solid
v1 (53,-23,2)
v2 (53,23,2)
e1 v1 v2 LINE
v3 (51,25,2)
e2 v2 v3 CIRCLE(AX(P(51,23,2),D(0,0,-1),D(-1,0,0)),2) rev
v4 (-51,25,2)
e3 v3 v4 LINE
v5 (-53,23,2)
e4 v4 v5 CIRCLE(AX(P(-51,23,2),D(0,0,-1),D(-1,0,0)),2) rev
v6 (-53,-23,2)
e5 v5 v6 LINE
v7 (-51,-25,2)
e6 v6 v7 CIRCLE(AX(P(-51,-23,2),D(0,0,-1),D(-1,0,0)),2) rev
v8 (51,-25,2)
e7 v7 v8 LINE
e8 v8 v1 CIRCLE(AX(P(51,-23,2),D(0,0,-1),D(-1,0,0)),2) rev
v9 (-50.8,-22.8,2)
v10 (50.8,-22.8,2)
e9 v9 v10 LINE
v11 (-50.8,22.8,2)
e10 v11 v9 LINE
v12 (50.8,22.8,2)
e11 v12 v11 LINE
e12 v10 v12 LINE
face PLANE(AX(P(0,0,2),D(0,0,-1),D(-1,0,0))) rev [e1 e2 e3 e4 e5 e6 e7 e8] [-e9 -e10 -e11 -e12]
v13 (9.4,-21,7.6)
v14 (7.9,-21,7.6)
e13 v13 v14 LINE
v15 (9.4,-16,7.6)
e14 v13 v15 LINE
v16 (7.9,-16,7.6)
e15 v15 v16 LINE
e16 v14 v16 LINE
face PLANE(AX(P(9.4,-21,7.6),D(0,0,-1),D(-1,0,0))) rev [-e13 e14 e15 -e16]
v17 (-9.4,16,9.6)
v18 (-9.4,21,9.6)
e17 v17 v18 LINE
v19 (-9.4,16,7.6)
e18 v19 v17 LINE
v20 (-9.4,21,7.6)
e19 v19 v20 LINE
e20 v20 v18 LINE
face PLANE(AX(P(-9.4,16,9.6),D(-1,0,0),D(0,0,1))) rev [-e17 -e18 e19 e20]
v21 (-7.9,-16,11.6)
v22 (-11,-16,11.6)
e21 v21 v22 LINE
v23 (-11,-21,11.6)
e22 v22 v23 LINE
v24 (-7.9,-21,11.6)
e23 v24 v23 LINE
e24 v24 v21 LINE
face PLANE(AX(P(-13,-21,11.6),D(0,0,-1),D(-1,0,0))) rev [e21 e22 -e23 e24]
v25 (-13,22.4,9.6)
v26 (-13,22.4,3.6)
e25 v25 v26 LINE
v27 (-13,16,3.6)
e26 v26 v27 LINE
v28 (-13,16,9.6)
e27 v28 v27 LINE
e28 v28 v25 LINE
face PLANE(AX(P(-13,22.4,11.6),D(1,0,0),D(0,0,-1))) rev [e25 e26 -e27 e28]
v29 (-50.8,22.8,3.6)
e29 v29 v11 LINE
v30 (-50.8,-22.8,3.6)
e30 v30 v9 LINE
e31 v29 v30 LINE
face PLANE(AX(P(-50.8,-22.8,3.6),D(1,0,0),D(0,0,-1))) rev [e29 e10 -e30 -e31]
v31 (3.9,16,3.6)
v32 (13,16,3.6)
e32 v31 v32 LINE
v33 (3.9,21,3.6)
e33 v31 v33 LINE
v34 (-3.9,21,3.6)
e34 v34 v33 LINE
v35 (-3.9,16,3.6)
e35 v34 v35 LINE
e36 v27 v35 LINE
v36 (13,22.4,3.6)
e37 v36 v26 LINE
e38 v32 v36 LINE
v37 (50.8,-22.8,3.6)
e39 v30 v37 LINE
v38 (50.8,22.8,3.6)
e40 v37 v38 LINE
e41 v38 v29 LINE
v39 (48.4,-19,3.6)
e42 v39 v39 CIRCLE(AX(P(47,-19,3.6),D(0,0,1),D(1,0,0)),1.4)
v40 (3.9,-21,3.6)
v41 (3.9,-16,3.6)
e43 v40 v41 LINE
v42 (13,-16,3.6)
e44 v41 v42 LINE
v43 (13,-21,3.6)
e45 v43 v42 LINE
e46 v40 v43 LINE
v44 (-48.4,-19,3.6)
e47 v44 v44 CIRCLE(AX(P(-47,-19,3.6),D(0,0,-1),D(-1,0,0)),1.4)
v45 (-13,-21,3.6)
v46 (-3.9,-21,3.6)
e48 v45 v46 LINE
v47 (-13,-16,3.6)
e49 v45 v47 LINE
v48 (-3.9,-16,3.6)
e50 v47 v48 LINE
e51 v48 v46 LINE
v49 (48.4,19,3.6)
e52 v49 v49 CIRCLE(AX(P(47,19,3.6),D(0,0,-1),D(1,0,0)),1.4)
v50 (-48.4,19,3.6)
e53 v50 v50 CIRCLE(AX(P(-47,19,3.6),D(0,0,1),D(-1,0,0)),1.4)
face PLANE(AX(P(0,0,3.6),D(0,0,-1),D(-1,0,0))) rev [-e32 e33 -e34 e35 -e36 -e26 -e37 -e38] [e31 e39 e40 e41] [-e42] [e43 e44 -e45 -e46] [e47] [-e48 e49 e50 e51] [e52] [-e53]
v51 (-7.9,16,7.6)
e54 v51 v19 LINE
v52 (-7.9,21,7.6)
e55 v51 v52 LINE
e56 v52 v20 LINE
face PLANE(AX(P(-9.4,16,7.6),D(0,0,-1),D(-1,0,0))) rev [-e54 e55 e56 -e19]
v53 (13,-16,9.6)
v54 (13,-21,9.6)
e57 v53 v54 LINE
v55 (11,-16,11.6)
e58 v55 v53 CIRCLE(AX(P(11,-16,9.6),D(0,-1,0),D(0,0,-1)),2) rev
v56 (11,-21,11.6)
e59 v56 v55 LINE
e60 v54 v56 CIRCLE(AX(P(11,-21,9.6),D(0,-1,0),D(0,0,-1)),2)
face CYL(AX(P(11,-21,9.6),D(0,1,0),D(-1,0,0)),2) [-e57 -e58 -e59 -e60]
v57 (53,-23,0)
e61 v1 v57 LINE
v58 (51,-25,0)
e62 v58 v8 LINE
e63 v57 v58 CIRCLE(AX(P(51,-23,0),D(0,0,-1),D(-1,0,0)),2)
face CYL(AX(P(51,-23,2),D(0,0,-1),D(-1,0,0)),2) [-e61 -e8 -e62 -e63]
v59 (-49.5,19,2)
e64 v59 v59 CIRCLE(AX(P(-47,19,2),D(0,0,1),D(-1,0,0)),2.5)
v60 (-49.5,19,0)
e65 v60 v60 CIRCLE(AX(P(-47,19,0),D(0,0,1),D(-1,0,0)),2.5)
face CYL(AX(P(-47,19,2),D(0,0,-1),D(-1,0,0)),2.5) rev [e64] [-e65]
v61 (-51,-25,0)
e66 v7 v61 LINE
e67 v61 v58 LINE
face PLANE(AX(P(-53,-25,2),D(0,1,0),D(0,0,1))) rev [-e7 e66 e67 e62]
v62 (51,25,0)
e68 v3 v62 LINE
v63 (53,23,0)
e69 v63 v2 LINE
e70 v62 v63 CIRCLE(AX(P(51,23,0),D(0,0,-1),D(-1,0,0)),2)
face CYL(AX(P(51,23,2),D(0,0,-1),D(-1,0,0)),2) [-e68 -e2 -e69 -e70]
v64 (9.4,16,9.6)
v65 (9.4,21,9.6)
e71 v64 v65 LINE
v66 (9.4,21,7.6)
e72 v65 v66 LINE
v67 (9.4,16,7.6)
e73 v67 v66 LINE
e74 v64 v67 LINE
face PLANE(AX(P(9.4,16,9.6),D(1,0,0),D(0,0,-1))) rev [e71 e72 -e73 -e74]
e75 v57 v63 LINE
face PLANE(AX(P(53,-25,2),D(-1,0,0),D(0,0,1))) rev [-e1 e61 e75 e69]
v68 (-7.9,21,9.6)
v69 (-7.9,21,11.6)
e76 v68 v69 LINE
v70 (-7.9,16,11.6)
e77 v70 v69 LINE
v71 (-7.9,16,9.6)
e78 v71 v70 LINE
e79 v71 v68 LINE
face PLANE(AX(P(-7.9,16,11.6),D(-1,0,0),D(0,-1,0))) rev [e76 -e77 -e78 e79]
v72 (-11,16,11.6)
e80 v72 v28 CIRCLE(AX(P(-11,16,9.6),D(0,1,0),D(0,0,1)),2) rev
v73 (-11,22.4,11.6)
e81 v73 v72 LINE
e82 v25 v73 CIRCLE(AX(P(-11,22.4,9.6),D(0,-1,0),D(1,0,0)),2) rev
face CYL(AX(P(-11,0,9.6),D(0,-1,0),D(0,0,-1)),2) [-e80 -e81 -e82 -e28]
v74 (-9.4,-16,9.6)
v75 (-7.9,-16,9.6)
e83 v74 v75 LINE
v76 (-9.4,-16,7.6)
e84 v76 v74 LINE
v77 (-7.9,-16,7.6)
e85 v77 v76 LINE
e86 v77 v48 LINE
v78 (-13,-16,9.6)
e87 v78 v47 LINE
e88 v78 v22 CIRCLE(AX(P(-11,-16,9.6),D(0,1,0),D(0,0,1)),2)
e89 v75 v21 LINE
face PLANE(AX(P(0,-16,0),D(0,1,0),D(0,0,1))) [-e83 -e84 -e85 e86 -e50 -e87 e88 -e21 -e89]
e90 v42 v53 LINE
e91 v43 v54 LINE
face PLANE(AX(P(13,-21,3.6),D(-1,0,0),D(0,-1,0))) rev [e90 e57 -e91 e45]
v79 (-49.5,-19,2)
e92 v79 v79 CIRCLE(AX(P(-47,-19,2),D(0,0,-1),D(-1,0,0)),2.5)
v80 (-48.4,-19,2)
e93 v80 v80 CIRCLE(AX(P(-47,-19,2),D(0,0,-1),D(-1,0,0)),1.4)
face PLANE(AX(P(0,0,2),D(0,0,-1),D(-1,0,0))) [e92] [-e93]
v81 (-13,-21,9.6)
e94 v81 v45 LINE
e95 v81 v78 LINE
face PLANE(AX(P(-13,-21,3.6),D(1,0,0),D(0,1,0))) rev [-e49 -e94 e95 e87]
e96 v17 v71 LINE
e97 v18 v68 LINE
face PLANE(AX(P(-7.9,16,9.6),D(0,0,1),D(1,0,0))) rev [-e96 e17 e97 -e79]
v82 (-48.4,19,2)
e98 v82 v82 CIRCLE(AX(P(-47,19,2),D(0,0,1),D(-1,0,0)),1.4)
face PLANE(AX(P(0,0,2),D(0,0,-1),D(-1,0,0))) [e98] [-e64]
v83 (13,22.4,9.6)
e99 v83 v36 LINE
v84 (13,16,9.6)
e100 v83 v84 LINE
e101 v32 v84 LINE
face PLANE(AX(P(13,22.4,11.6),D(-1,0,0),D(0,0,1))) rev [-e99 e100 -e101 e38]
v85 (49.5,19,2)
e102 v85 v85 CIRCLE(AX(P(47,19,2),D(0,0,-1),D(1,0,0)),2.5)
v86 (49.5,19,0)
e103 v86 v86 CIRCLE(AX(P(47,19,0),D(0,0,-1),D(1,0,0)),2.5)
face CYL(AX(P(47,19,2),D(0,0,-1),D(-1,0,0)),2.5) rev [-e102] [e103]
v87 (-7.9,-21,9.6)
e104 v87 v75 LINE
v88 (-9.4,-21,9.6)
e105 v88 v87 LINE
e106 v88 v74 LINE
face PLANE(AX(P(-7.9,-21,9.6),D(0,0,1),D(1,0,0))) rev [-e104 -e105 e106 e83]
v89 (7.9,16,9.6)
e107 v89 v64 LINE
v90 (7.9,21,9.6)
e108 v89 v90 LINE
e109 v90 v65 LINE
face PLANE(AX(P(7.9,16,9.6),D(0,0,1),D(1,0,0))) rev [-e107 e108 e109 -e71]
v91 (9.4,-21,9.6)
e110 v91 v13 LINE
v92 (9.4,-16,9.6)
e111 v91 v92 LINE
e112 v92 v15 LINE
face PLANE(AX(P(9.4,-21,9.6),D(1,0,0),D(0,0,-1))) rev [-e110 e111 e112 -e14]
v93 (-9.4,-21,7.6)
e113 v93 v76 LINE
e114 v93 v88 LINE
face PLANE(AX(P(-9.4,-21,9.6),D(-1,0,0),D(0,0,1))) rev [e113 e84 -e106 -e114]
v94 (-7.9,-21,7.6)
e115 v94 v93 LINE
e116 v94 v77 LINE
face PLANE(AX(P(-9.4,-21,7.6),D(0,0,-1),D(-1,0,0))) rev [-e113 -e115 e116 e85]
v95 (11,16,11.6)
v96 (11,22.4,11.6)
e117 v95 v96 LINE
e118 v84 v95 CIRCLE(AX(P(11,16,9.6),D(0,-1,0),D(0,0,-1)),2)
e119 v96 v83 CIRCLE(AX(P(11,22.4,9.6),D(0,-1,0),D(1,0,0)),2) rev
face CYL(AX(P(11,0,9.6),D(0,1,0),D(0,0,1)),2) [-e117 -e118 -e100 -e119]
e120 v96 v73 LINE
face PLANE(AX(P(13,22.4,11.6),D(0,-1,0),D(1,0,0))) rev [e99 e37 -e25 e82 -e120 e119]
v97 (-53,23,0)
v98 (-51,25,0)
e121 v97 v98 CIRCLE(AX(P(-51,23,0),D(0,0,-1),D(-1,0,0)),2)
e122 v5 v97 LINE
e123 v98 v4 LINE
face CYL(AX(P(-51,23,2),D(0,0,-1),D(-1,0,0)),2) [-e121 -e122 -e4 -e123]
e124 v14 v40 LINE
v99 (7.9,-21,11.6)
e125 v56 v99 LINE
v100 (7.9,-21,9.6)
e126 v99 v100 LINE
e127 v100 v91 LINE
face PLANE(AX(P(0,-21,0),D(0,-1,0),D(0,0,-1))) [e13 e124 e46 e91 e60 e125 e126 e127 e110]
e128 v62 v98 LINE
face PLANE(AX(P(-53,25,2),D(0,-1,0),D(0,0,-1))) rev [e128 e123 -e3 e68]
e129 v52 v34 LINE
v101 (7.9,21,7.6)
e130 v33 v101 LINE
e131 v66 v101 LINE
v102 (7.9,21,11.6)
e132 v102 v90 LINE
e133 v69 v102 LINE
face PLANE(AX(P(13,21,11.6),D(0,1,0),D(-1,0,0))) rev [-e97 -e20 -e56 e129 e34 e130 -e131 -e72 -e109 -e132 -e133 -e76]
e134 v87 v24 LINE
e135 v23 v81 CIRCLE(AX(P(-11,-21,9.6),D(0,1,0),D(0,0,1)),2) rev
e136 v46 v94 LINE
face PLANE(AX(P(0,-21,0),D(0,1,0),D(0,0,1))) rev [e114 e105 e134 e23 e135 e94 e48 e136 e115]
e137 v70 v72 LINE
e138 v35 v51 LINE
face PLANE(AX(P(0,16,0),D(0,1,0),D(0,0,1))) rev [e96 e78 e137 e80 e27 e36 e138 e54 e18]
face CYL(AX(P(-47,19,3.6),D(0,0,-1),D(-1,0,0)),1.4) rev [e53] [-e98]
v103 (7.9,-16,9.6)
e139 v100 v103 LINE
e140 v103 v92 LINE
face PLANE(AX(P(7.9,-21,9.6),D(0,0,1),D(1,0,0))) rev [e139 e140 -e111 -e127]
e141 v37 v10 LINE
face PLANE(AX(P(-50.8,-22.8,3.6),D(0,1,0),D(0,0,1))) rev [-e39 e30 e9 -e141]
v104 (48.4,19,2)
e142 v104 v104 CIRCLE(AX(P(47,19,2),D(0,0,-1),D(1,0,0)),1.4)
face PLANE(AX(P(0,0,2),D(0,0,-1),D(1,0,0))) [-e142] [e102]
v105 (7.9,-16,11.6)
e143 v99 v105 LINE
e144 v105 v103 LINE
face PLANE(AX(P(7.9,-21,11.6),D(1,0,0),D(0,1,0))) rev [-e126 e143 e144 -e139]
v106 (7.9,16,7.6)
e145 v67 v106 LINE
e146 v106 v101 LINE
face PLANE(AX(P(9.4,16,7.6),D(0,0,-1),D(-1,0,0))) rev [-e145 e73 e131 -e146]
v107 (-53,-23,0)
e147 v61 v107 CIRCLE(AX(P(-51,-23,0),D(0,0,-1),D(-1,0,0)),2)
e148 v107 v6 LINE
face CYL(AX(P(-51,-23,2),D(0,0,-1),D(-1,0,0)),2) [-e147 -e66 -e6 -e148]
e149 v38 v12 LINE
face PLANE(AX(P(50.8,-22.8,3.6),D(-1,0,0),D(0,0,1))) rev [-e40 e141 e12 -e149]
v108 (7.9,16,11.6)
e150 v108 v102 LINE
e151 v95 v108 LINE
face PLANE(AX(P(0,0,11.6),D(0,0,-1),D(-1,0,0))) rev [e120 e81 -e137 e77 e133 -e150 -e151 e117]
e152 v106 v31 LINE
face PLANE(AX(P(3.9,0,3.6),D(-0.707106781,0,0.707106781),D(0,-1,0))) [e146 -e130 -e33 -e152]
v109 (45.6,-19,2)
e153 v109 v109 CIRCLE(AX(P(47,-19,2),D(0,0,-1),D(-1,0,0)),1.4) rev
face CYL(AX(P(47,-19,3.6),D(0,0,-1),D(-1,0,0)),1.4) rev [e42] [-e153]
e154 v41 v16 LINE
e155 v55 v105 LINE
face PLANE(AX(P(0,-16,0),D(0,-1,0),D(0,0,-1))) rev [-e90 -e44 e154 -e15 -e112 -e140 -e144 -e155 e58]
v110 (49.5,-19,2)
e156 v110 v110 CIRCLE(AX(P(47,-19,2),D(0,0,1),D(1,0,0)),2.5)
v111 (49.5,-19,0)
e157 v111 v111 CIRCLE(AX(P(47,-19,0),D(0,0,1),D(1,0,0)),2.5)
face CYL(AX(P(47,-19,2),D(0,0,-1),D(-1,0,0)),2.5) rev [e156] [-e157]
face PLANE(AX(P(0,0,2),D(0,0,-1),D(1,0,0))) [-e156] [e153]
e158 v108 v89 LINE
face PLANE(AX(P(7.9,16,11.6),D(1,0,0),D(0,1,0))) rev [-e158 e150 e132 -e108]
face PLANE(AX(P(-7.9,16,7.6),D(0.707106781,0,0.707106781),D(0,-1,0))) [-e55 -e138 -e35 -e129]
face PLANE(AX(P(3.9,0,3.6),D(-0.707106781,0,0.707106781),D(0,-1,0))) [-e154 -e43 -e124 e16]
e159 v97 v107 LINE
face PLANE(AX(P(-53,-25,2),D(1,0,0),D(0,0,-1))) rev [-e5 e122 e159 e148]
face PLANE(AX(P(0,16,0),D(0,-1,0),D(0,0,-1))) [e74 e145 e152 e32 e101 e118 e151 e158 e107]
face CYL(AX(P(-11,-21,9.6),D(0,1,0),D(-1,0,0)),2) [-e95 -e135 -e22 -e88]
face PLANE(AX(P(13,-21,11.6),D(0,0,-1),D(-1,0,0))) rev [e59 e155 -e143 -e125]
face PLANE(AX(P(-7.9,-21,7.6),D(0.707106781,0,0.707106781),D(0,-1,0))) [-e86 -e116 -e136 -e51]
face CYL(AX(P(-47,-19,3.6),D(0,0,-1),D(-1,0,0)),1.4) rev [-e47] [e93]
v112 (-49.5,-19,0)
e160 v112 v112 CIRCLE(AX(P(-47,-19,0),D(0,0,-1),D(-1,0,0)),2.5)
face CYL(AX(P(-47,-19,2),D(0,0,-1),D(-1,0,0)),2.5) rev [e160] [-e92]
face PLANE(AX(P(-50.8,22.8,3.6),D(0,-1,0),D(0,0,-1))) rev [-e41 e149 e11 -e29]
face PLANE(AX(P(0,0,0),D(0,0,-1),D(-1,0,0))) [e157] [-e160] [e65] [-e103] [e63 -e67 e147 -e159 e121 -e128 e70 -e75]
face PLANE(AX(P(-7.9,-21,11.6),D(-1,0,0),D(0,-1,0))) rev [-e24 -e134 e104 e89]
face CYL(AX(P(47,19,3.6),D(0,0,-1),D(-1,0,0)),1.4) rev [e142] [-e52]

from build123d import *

# Parameters (mm, degrees)
SKETCH_1_W                     = 106
SKETCH_1_H                     = 50
BODY_DEPTH                     = 2
SKETCH_2_W                     = 101.6
SKETCH_2_H                     = 45.6
INTERNALBODY_DEPTH             = 1.6
SKETCH_3_R                     = 1.4
HOLESCREW_DEPTH                = 59.710816721
SKETCH_3_3_R                   = 2.5
SKETCH_3_3_R_2                 = 1.4
TOPSCREWPLACE_DEPTH            = 2
SCREWMIRROR2_COPY_1_SKETCH_R   = 1.4
SCREWMIRROR2_COPY_1_DEPTH      = 59.710816721
SCREWMIRROR2_COPY_2_SKETCH_R   = 2.5
SCREWMIRROR2_COPY_2_SKETCH_R_2 = 1.4
SCREWMIRROR2_COPY_2_DEPTH      = 2
CORNERS_R                      = 2
SKETCH_4_W                     = 26
SKETCH_4_H                     = 1.4
ARDUINONANOSTOPS_DEPTH         = 8
ARDUINONANOHOLDER1_DEPTH       = 5
PATTERN_LINEAR_1_COUNT         = 2
PATTERN_LINEAR_1_PITCH         = 37
CHAMFER_1_SIZE                 = 4
FILLET_1_R                     = 2


with BuildPart() as part:
    # Эскиз1 → Body (new body)
    with BuildSketch(Plane.XY):
        Rectangle(SKETCH_1_W, SKETCH_1_H)
    extrude(amount=BODY_DEPTH)

    # Эскиз2 → InternalBody (add)
    with BuildSketch(Plane.XY.offset(2)):
        Rectangle(SKETCH_2_W, SKETCH_2_H)
    extrude(amount=INTERNALBODY_DEPTH)

    # Эскиз3 → HoleScrew (cut, through all)
    with BuildSketch(Plane(origin=(0, 0, 0), x_dir=(-1, 0, 0), z_dir=(0, 0, -1))):
        with Locations((47, -19)):
            Circle(SKETCH_3_R)
    holescrew = extrude(amount=-HOLESCREW_DEPTH, mode=Mode.SUBTRACT)

    # Эскиз3<3> → TopScrewPlace (cut)
    with BuildSketch(Plane(origin=(0, 0, 0), x_dir=(-1, 0, 0), z_dir=(0, 0, -1))):
        with Locations((47, -19)):
            Circle(SKETCH_3_3_R)
        with Locations((47, -19)):
            Circle(SKETCH_3_3_R_2, mode=Mode.SUBTRACT)
    topscrewplace = extrude(amount=-TOPSCREWPLACE_DEPTH, mode=Mode.SUBTRACT)

    # ScrewMrror1: HoleScrew, TopScrewPlace across plane
    add(holescrew.mirror(Plane.ZX), mode=Mode.SUBTRACT)
    add(topscrewplace.mirror(Plane.ZX), mode=Mode.SUBTRACT)

    # ScrewMirror2: HoleScrew, TopScrewPlace across plane
    add(holescrew.mirror(Plane(origin=(0, 0, 0), x_dir=(0, 0, 1), z_dir=(1, 0, 0))), mode=Mode.SUBTRACT)
    add(topscrewplace.mirror(Plane(origin=(0, 0, 0), x_dir=(0, 0, 1), z_dir=(1, 0, 0))), mode=Mode.SUBTRACT)

    # ScrewMirror2 copy 1 sketch → ScrewMirror2 copy 1 (cut, through all)
    with BuildSketch(Plane(origin=(0, 0, 0), x_dir=(1, 0, 0), z_dir=(0, 0, -1))):
        with Locations((47, -19)):
            Circle(SCREWMIRROR2_COPY_1_SKETCH_R)
    extrude(amount=-SCREWMIRROR2_COPY_1_DEPTH, mode=Mode.SUBTRACT)

    # ScrewMirror2 copy 2 sketch → ScrewMirror2 copy 2 (cut)
    with BuildSketch(Plane(origin=(0, 0, 0), x_dir=(1, 0, 0), z_dir=(0, 0, -1))):
        with Locations((47, -19)):
            Circle(SCREWMIRROR2_COPY_2_SKETCH_R)
        with Locations((47, -19)):
            Circle(SCREWMIRROR2_COPY_2_SKETCH_R_2, mode=Mode.SUBTRACT)
    extrude(amount=-SCREWMIRROR2_COPY_2_DEPTH, mode=Mode.SUBTRACT)

    # Corners
    corners_edges = [part.edges().sort_by_distance(p)[0] for p in [
        (53, -25, 1),
        (-53, -25, 1),
        (-53, 25, 1),
        (53, 25, 1),
    ]]
    fillet(corners_edges, radius=CORNERS_R)

    # Эскиз4 → ArduinoNanoStops (add)
    with BuildSketch(Plane.XY.offset(3.6)):
        with Locations((0, 21.7)):
            Rectangle(SKETCH_4_W, SKETCH_4_H)
    extrude(amount=ARDUINONANOSTOPS_DEPTH)

    # Эскиз5 → ArduinoNanoHolder1 (add)
    with BuildSketch(Plane.XZ.offset(-21)):
        Polygon((-7.9, 11.6), (-7.9, 9.6), (-9.4, 9.6), (-9.4, 7.6), (-7.9, 7.6), (-7.9, 3.6), (-13, 3.6), (-13, 11.6), align=None)
        Polygon((7.9, 11.6), (7.9, 9.6), (9.4, 9.6), (9.4, 7.6), (7.9, 7.6), (7.9, 3.6), (13, 3.6), (13, 11.6), align=None)
    arduinonanoholder1 = extrude(amount=ARDUINONANOHOLDER1_DEPTH)

    # Линейный массив1: ArduinoNanoHolder1 ×2
    with Locations(*[(0, -i * PATTERN_LINEAR_1_PITCH, 0) for i in range(1, PATTERN_LINEAR_1_COUNT)]):
        add(arduinonanoholder1)

    # Фаска1
    chamfer_1_edges = [part.edges().sort_by_distance(p)[0] for p in [
        (7.9, 18.5, 3.6),
        (7.9, -18.5, 3.6),
        (-7.9, -18.5, 3.6),
        (-7.9, 18.5, 3.6),
    ]]
    chamfer(chamfer_1_edges, length=CHAMFER_1_SIZE - 0.0001)  # a hair under: the kernel refuses the full size

    # Скругление1
    fillet_1_edges = [part.edges().sort_by_distance(p)[0] for p in [
        (-13, 19.2, 11.6),
        (13, 19.2, 11.6),
        (-13, -18.5, 11.6),
        (13, -18.5, 11.6),
    ]]
    fillet(fillet_1_edges, radius=FILLET_1_R)


solid = part.part
